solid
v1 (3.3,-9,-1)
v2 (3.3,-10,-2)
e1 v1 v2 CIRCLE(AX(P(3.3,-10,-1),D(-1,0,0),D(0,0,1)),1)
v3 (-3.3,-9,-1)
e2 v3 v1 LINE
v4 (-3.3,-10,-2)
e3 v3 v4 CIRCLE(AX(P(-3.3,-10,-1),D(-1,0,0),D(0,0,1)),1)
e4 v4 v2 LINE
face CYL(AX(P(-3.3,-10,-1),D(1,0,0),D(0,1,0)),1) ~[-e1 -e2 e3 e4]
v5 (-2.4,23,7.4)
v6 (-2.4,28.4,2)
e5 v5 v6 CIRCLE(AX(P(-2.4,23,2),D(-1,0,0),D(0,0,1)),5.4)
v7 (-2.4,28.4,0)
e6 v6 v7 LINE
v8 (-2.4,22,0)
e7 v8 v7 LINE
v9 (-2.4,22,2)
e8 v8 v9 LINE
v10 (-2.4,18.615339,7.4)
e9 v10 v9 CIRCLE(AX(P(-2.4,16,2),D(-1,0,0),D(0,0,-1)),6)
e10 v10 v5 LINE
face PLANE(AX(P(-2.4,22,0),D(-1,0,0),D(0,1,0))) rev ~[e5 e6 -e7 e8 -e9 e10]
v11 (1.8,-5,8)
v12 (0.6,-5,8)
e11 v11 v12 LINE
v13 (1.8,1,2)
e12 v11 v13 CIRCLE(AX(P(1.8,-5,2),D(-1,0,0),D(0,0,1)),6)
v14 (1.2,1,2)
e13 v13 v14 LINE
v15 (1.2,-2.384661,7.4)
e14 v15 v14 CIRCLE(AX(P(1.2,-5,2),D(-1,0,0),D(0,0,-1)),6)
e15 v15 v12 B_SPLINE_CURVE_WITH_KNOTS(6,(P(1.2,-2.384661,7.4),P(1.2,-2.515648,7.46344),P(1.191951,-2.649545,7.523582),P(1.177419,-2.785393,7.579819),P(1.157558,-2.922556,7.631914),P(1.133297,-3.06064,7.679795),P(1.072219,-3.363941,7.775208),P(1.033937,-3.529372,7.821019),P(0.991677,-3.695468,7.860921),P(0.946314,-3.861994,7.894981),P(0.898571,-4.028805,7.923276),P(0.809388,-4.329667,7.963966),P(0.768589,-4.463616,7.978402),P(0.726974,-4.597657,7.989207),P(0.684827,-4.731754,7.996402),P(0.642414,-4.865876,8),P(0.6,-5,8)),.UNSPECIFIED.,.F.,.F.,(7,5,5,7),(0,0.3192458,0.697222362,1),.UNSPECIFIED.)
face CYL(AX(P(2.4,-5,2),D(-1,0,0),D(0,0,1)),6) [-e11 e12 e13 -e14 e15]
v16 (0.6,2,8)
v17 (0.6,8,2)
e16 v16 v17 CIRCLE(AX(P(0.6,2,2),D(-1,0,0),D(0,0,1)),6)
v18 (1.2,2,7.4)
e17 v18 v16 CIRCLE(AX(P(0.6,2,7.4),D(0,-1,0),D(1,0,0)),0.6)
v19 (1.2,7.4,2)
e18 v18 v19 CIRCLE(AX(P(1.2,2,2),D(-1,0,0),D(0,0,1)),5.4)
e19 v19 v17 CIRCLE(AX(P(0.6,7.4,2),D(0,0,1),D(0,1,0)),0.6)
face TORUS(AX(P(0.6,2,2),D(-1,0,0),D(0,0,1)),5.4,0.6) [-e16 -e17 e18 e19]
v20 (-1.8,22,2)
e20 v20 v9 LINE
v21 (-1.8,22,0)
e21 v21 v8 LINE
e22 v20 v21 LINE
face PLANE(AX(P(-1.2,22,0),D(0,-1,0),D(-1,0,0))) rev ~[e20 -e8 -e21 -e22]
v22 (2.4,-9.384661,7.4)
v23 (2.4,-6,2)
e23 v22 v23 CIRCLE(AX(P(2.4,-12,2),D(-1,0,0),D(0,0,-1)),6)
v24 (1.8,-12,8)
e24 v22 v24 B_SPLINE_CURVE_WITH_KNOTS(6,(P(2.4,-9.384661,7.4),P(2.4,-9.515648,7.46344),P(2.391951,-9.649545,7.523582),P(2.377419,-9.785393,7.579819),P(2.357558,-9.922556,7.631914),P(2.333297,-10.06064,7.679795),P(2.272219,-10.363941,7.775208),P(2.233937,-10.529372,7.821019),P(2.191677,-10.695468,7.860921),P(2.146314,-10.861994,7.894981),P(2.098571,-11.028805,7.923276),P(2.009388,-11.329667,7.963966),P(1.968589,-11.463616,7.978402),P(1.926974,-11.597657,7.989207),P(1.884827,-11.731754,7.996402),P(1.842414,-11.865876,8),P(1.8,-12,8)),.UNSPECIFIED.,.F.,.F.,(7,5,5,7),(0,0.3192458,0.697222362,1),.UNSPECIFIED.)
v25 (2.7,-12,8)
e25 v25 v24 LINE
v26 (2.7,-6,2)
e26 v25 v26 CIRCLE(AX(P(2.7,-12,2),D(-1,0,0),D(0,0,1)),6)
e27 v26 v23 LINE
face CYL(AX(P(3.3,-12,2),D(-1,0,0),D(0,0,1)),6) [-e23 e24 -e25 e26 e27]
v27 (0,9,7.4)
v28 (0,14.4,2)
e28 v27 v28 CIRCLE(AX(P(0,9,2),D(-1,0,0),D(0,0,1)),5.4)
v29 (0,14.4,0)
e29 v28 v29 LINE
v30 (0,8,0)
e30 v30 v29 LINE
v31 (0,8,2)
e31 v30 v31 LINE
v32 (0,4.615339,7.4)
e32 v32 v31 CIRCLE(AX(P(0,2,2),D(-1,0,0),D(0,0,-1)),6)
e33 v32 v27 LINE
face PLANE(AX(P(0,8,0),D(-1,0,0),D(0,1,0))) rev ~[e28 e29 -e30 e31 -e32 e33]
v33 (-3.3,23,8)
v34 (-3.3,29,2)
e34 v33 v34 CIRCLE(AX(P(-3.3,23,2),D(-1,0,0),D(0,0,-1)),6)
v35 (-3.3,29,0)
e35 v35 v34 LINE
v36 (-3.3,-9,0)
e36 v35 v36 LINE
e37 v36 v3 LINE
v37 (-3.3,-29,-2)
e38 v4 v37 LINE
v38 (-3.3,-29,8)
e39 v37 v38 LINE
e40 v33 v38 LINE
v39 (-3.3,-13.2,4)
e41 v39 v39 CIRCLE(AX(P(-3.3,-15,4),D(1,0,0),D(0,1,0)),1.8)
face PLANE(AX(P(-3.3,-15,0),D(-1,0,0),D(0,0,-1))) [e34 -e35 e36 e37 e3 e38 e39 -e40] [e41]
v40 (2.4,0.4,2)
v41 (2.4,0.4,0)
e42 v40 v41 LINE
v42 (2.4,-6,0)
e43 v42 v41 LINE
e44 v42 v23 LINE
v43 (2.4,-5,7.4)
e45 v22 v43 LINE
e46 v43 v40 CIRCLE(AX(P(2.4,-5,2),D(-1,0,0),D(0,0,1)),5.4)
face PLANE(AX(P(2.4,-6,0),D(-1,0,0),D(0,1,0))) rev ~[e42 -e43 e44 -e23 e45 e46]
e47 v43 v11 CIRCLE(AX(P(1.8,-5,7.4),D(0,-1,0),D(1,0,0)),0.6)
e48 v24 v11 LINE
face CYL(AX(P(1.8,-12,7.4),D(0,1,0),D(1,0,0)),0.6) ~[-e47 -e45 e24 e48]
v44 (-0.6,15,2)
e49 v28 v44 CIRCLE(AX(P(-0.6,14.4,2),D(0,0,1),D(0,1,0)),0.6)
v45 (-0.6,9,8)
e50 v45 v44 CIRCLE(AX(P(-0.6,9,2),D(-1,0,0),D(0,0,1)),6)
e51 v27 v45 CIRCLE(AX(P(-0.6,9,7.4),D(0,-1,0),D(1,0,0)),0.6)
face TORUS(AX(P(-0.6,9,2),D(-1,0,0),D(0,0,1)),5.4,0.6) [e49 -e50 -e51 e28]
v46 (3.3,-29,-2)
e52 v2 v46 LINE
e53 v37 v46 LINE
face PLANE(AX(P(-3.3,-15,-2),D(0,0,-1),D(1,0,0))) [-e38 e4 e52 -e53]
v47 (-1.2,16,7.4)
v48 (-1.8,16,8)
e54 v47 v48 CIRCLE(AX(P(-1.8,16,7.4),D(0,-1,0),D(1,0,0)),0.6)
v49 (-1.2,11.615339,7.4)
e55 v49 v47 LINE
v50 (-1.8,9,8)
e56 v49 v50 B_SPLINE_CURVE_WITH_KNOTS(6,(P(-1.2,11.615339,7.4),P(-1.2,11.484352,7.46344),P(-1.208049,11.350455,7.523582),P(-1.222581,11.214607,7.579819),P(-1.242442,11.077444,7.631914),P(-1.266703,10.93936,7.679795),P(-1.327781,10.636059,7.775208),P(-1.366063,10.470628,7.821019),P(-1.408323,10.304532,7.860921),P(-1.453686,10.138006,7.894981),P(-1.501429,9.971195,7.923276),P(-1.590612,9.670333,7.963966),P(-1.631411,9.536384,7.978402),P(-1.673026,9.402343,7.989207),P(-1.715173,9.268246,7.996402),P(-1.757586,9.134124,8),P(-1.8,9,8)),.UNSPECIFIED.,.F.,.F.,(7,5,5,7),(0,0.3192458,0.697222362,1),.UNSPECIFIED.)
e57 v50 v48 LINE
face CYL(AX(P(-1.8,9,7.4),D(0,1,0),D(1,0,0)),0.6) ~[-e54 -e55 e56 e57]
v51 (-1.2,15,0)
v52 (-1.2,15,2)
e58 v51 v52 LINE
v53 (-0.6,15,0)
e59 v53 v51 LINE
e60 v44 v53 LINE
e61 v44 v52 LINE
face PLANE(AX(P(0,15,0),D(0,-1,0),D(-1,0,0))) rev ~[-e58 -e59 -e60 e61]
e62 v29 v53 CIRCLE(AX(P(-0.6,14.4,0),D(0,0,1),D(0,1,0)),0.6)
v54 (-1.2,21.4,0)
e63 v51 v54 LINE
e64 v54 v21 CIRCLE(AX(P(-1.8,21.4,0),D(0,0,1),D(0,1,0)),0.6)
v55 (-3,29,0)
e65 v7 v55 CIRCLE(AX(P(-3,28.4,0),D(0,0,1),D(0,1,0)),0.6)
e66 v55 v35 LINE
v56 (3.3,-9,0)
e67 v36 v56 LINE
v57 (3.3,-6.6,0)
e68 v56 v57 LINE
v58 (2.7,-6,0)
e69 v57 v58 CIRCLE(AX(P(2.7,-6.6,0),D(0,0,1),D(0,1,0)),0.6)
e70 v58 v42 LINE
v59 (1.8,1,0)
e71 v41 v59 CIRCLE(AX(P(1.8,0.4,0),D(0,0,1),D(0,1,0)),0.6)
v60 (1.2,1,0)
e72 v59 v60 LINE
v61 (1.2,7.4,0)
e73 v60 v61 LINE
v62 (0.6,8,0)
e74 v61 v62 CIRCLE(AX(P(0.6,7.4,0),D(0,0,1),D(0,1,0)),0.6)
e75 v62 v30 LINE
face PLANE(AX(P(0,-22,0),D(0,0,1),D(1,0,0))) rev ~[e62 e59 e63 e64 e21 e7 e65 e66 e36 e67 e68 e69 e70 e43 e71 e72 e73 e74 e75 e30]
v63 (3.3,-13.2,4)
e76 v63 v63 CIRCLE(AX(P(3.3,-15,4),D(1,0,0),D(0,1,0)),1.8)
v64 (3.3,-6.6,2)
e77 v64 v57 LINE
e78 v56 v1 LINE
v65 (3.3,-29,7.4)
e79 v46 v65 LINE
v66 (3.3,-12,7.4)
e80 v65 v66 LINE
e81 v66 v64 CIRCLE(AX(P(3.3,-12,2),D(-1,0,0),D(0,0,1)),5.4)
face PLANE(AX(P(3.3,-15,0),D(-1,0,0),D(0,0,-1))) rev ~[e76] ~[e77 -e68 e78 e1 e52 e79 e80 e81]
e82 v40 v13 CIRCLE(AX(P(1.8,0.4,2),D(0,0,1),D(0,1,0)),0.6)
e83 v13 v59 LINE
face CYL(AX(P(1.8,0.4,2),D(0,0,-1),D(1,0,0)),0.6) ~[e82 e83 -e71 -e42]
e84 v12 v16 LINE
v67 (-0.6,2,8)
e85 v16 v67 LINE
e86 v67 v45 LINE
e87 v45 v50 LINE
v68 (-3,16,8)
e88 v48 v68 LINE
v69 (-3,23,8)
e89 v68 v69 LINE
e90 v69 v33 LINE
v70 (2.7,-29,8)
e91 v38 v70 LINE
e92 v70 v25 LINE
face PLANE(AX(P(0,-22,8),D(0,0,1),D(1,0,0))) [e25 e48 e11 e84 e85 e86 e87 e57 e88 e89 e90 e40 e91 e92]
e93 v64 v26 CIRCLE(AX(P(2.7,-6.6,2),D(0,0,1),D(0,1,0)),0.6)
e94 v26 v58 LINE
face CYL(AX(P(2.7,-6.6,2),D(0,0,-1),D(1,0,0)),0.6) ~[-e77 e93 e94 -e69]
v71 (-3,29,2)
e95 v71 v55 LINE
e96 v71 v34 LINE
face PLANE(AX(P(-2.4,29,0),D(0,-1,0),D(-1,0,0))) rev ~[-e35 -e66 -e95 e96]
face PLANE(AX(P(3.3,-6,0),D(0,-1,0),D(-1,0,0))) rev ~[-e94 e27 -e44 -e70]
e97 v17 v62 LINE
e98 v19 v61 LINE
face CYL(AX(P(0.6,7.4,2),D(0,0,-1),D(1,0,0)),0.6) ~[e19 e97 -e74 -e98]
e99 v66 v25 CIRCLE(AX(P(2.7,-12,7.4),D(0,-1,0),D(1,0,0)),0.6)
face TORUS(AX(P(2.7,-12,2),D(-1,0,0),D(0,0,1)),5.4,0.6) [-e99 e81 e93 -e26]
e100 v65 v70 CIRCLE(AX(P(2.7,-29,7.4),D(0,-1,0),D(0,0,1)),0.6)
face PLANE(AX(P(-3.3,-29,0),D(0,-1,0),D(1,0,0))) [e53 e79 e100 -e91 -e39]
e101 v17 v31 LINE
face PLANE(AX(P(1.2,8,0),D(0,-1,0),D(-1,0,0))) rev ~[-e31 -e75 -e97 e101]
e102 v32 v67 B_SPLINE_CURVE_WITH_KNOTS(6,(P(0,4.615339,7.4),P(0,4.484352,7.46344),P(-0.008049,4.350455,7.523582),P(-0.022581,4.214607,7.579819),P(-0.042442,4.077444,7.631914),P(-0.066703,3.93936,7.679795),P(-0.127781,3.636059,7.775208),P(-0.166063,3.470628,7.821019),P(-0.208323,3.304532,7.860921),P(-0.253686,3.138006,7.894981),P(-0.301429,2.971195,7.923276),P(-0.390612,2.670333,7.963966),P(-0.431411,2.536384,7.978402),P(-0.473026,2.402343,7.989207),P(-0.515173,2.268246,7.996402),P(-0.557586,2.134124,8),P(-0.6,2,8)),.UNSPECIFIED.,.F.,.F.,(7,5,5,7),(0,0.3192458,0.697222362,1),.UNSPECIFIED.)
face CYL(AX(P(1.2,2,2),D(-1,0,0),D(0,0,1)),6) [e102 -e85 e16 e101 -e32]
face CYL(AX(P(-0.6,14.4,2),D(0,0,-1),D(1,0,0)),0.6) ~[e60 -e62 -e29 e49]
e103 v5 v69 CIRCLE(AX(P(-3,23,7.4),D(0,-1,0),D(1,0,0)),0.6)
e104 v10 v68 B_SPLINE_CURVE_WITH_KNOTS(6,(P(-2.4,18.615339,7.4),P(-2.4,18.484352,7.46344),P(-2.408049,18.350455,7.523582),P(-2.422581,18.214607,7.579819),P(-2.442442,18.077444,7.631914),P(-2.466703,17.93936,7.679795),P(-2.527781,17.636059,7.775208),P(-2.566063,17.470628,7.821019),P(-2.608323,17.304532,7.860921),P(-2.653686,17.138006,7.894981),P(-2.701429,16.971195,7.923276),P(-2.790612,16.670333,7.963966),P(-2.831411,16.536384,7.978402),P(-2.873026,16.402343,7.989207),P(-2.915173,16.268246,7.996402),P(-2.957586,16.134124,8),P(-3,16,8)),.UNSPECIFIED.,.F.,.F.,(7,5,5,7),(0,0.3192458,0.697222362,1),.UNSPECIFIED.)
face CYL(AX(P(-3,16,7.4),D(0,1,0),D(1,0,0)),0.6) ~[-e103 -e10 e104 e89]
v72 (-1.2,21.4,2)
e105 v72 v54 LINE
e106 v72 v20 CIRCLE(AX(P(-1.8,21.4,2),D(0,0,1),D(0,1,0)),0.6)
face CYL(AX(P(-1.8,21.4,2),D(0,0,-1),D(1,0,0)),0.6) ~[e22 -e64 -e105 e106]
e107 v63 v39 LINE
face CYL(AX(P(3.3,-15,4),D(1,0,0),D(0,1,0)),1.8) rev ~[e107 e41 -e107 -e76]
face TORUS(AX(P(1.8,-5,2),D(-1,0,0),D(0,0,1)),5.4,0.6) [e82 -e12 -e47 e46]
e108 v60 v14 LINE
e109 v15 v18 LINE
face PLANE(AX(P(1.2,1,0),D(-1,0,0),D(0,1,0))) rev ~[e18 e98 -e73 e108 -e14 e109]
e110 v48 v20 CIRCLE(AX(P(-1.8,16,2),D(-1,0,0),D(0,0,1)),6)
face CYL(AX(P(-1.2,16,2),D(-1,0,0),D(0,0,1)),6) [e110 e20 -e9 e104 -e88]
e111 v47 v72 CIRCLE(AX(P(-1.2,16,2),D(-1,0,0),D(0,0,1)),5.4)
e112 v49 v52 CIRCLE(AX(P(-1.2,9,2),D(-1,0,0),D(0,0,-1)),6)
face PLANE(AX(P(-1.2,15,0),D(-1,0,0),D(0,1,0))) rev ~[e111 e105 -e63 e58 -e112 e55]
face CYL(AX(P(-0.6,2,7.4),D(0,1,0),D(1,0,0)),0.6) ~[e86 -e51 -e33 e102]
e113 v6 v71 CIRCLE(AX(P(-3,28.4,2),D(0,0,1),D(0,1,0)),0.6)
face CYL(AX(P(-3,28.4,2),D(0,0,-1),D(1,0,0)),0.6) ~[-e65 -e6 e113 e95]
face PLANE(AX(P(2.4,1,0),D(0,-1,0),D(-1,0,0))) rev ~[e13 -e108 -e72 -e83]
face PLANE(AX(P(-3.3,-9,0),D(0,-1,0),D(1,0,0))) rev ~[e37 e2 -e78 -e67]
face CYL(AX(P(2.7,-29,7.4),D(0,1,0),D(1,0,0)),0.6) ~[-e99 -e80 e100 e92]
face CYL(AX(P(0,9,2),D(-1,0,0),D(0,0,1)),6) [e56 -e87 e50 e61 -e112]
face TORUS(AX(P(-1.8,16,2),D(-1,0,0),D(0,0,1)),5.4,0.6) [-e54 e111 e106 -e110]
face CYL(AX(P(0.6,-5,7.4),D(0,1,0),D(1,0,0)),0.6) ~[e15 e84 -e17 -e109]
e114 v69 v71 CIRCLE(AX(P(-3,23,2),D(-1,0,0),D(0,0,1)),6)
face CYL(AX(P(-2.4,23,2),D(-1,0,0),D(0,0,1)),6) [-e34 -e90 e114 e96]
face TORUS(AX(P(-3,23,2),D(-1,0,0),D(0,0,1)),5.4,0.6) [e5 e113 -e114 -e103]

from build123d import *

# Parameters (mm, degrees)
F0_W     = 6.6
F0_H     = 14
F1_DEPTH = 8
F2_DEPTH = 2
F3_R     = 1.8
F4_DEPTH = 6.6
F5_R     = 6
F6_R     = 0.6
F7_DEPTH = 6
F8_R     = 1


with BuildPart() as f1:
    # F0 (on Top) → F1 (new body)
    with BuildSketch(Plane.XY):
        with Locations((0, -22)):
            Rectangle(F0_W, F0_H)
        Polygon((-3.3, -15), (3.3, -15), (3.3, -6), (2.4, -6), (2.4, 1), (1.2, 1), (1.2, 8), (0, 8), (0, 15), (-1.2, 15), (-1.2, 22), (-2.4, 22), (-2.4, 29), (-3.3, 29), align=None)
    extrude(amount=F1_DEPTH)

    # F0 (on Top) → F2 (join)
    with BuildSketch(Plane.XY):
        with Locations((0, -22)):
            Rectangle(F0_W, F0_H)
    extrude(amount=-F2_DEPTH)

    # F3 (on face) → F4 (cut)
    with BuildSketch(Plane.YZ.offset(3.3)):
        with Locations((-15, 4)):
            Circle(F3_R)
    extrude(amount=-F4_DEPTH, mode=Mode.SUBTRACT)

    # F5
    f5_edges = [f1.edges().sort_by_distance(p)[0] for p in [
        (2.85, -6, 8),
        (1.8, 1, 8),
        (0.6, 8, 8),
        (-0.6, 15, 8),
        (-1.8, 22, 8),
        (-2.85, 29, 8),
    ]]
    fillet(f5_edges, radius=F5_R)

    # F6
    f6_edges = [f1.edges().sort_by_distance(p)[0] for p in [
        (-2.4, 27.242641, 6.242641),
        (-2.4, 29, 1),
        (3.3, -20.5, 8),
        (2.4, -9, 8),
        (2.4, -5.5, 8),
        (-2.4, 22.5, 8),
        (1.2, -2, 8),
        (-2.4, 19, 8),
        (1.2, 1.5, 8),
        (-1.2, 15.5, 8),
        (0, 5, 8),
        (-1.2, 12, 8),
        (0, 8.5, 8),
        (-1.2, 22, 1),
        (-1.2, 20.242641, 6.242641),
        (0, 15, 1),
        (0, 13.242641, 6.242641),
        (1.2, 8, 1),
        (1.2, 6.242641, 6.242641),
        (2.4, 1, 1),
        (2.4, -0.757359, 6.242641),
        (3.3, -6, 1),
        (3.3, -7.757359, 6.242641),
    ]]
    fillet(f6_edges, radius=F6_R)

    # F7 (add): a face of the model
    f7_faces = [f1.faces().sort_by_distance(p)[0] for p in [
        (0, -15, -1),
    ]]
    extrude(f7_faces, amount=F7_DEPTH)

    # F8
    f8_edges = [f1.edges().sort_by_distance(p)[0] for p in [
        (0, -9, -2),
    ]]
    fillet(f8_edges, radius=F8_R)


solid = f1.part
